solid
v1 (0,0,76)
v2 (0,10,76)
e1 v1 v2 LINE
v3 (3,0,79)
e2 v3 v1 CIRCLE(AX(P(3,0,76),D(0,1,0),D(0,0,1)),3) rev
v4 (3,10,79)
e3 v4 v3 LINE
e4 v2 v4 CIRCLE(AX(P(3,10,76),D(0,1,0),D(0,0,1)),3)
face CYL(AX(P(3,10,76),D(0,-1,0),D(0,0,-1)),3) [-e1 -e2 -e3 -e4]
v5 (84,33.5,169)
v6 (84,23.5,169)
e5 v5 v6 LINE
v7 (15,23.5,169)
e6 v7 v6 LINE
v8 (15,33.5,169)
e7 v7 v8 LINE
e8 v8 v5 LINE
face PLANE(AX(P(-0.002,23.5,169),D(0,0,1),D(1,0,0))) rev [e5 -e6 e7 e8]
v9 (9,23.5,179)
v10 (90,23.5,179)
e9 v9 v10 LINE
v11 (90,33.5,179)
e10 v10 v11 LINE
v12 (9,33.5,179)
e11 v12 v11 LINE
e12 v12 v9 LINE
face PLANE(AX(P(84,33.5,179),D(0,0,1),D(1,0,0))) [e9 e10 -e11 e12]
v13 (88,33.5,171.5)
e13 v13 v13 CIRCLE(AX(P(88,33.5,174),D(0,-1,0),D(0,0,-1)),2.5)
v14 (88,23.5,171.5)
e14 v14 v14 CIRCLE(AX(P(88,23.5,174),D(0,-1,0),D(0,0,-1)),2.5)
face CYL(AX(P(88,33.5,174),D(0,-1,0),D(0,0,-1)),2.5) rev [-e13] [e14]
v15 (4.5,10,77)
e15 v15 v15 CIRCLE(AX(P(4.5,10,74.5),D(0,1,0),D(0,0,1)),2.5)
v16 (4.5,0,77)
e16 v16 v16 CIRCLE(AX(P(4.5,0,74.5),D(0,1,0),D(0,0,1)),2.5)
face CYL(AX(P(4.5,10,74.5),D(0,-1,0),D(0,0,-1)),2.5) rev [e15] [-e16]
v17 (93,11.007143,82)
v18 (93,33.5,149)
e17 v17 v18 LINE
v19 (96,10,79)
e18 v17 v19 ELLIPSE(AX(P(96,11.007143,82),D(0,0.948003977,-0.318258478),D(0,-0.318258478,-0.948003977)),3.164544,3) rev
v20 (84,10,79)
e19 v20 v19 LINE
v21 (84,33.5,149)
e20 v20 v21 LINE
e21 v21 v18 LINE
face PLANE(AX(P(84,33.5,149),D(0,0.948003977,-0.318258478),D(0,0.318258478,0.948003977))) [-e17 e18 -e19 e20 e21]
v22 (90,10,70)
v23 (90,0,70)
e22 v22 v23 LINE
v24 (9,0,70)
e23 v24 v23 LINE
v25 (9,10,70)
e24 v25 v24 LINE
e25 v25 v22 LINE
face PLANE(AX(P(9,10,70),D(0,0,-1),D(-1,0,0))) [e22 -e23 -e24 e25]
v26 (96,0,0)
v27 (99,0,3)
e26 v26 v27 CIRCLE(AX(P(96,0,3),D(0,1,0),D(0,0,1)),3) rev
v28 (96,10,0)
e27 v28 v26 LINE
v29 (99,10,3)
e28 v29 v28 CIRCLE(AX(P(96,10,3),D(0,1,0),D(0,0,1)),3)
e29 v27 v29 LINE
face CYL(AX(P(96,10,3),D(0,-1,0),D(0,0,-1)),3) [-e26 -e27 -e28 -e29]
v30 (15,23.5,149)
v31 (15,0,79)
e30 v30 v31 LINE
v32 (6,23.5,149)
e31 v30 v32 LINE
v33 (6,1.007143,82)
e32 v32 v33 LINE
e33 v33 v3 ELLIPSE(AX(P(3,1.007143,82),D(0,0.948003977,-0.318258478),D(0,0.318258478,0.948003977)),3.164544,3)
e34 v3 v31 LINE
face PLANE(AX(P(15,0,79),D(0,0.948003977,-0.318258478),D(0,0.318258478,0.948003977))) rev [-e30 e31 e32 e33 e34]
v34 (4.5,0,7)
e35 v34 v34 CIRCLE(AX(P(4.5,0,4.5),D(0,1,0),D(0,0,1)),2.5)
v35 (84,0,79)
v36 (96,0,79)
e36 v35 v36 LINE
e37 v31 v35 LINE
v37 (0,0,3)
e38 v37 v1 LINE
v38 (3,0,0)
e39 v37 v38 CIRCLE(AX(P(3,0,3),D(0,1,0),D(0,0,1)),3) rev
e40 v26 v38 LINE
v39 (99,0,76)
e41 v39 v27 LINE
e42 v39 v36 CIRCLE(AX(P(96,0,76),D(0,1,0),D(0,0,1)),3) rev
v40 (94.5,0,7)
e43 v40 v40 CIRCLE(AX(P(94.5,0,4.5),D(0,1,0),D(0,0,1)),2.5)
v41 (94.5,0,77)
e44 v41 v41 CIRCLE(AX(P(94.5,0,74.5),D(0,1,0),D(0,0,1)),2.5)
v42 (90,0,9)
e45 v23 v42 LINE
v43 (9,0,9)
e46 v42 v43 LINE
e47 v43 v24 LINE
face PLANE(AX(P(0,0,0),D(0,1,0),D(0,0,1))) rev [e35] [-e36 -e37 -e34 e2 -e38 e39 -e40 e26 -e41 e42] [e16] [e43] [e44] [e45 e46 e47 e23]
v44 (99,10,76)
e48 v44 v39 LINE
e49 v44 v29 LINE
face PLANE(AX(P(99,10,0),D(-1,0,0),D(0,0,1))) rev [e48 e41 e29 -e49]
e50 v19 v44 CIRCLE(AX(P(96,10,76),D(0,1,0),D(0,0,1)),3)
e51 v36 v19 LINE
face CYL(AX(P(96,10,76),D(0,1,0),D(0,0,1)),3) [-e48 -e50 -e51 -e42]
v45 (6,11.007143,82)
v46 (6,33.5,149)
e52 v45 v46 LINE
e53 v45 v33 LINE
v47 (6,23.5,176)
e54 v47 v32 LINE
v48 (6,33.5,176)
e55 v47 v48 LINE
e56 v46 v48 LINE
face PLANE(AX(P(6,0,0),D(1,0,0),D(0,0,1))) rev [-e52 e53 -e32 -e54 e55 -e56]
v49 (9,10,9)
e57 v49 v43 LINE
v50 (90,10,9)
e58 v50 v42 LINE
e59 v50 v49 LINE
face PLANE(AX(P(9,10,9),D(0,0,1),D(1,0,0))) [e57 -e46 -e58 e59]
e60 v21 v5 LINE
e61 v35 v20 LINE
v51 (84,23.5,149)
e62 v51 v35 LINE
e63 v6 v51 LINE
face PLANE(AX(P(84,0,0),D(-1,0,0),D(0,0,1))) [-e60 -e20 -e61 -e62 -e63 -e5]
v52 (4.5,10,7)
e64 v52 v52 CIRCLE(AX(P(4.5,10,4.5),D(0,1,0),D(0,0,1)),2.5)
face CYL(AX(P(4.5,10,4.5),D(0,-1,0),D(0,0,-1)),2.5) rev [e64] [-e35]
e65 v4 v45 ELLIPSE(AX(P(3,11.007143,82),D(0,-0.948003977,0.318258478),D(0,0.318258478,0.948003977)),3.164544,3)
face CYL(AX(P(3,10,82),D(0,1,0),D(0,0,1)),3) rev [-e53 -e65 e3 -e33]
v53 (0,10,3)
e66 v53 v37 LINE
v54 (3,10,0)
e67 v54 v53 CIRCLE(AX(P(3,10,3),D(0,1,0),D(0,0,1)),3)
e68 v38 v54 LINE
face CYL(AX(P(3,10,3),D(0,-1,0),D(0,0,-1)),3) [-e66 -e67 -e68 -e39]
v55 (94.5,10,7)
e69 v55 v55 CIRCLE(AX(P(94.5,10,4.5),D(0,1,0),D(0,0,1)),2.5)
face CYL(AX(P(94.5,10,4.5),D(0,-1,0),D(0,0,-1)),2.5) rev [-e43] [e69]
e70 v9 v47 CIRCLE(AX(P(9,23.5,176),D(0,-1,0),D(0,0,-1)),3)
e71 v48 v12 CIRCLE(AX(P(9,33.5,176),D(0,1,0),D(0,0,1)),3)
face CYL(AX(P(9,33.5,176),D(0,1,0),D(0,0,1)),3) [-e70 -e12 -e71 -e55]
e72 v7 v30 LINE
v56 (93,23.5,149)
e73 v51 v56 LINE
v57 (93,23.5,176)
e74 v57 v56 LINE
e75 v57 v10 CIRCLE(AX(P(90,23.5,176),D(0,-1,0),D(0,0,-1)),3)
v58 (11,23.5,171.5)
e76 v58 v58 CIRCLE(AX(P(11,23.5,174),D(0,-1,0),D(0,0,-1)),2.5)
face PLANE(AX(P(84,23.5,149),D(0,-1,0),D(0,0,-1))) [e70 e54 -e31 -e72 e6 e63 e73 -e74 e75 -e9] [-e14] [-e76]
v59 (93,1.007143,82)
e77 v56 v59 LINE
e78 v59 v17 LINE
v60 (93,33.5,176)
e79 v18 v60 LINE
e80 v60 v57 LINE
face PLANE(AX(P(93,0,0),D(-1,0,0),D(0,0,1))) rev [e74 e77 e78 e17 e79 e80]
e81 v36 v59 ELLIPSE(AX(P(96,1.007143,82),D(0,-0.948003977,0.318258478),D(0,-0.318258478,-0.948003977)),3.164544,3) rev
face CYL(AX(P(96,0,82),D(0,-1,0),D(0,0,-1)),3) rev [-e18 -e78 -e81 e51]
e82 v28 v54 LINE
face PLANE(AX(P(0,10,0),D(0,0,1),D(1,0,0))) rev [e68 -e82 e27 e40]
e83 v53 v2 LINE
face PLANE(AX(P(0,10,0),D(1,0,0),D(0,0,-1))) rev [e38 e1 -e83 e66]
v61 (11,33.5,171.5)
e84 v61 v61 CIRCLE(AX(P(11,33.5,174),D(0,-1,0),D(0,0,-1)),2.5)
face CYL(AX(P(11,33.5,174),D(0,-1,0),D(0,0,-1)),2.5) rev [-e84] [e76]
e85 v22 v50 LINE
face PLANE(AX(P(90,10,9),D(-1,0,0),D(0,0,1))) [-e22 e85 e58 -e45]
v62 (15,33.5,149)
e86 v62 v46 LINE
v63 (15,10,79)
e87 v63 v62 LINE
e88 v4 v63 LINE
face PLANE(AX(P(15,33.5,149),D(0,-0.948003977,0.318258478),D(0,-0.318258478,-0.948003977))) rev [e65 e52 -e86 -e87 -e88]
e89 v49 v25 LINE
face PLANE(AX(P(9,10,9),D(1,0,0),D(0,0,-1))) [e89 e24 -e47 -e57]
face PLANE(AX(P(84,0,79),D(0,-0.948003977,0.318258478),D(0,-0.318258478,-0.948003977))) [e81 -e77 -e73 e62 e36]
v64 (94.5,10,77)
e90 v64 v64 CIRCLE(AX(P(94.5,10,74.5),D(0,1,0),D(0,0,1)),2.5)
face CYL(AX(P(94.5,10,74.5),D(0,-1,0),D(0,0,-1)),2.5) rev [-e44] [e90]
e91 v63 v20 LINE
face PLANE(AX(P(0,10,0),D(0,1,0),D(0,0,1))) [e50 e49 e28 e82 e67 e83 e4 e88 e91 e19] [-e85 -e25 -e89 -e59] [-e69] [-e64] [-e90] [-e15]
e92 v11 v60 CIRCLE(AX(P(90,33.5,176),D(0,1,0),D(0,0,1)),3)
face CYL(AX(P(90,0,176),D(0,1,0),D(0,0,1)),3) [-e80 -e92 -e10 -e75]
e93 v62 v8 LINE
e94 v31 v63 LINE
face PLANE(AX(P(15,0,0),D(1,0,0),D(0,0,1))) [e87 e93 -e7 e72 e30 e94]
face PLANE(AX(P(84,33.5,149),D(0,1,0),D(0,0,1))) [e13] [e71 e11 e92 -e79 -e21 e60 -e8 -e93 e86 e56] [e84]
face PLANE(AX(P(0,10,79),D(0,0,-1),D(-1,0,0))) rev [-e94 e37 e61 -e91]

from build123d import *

# Parameters (mm, degrees)
SKETCH_1_W          = 99
SKETCH_1_H          = 79
SKETCH_1_R          = 2.5
SKETCH_1_W_2        = 81
SKETCH_1_H_2        = 61
EXTRUDE_1_DEPTH     = 10
EXTRUDE_2_DEPTH     = 15
CUT_EXTRUDE_1_DEPTH = 6
EXTRUDE_3_REACH     = 202.547
SKETCH_7_W          = 10
SKETCH_7_H          = 10
SKETCH_8_R          = 2.5
CUT_EXTRUDE_2_DEPTH = 206.898640112
FILLET_1_R          = 3


with BuildPart() as part:
    # 草图1 → 凸台-拉伸1 (new body)
    with BuildSketch(Plane(origin=(0, 0, 0), x_dir=(1, 0, 0), z_dir=(0, 1, 0))):
        with Locations((49.5, -39.5)):
            Rectangle(SKETCH_1_W, SKETCH_1_H)
        with Locations(Location((94.5, -4.5, 0), (0, 0, 270))):
            Circle(SKETCH_1_R, mode=Mode.SUBTRACT)
        with Locations(Location((4.5, -4.5, 0), (0, 0, 270))):
            Circle(SKETCH_1_R, mode=Mode.SUBTRACT)
        with Locations(Location((4.5, -74.5, 0), (0, 0, 270))):
            Circle(SKETCH_1_R, mode=Mode.SUBTRACT)
        with Locations(Location((94.5, -74.5, 0), (0, 0, 270))):
            Circle(SKETCH_1_R, mode=Mode.SUBTRACT)
        with Locations((49.5, -39.5)):
            Rectangle(SKETCH_1_W_2, SKETCH_1_H_2, mode=Mode.SUBTRACT)
    extrude(amount=EXTRUDE_1_DEPTH)

    # 草图4 → 凸台-拉伸2 (add)
    with BuildSketch(Plane(origin=(99, 0, 0), x_dir=(0, 0, -1), z_dir=(1, 0, 0))):
        Polygon((-79, 0), (-149, 23.5), (-179, 23.5), (-179, 33.5), (-149, 33.5), (-79, 10), align=None)
    extrude_2 = extrude(amount=-EXTRUDE_2_DEPTH)

    # 镜向1: 凸台-拉伸2 across plane
    add(extrude_2.mirror(Plane.ZY.offset(-49.5)))

    # 草图4<2> → 切除-拉伸1 (cut)
    with BuildSketch(Plane(origin=(99, 0, 0), x_dir=(0, 0, -1), z_dir=(1, 0, 0))):
        Polygon((-79, 0), (-149, 23.5), (-179, 23.5), (-179, 33.5), (-149, 33.5), (-79, 10), align=None)
    cut_extrude_1 = extrude(amount=-CUT_EXTRUDE_1_DEPTH, mode=Mode.SUBTRACT)

    # 镜向2: 切除-拉伸1 across plane
    add(cut_extrude_1.mirror(Plane.ZY.offset(-49.5)), mode=Mode.SUBTRACT)

    # 草图7 → 凸台-拉伸3 (add, up to next)
    with BuildSketch(Plane.ZY.offset(-84), mode=Mode.PRIVATE) as extrude_3_sk1:
        with Locations((174, 28.5)):
            Rectangle(SKETCH_7_W, SKETCH_7_H)
    extrude_3_tool1 = extrude(extrude_3_sk1.sketch, amount=EXTRUDE_3_REACH, mode=Mode.PRIVATE) - part.part
    add(extrude_3_tool1.solids().sort_by_distance((84, 28.5, 174))[0])

    # 草图8 → 切除-拉伸2 (cut, through all)
    with BuildSketch(Plane.XZ.offset(-23.5)):
        with Locations(Location((88, 174, 0), (0, 0, 270))):
            Circle(SKETCH_8_R)
        with Locations(Location((11, 174, 0), (0, 0, 270))):
            Circle(SKETCH_8_R)
    extrude(amount=-CUT_EXTRUDE_2_DEPTH, mode=Mode.SUBTRACT)

    # 圆角1
    fillet_1_edges = [part.edges().sort_by_distance(p)[0] for p in [
        (0, 5, 79),
        (6, 5, 79),
        (6, 28.5, 179),
        (0, 5, 0),
        (99, 5, 0),
        (93, 5, 79),
        (93, 28.5, 179),
        (99, 5, 79),
    ]]
    fillet(fillet_1_edges, radius=FILLET_1_R - 0.0001)  # a hair under: the kernel refuses the full size


solid = part.part
